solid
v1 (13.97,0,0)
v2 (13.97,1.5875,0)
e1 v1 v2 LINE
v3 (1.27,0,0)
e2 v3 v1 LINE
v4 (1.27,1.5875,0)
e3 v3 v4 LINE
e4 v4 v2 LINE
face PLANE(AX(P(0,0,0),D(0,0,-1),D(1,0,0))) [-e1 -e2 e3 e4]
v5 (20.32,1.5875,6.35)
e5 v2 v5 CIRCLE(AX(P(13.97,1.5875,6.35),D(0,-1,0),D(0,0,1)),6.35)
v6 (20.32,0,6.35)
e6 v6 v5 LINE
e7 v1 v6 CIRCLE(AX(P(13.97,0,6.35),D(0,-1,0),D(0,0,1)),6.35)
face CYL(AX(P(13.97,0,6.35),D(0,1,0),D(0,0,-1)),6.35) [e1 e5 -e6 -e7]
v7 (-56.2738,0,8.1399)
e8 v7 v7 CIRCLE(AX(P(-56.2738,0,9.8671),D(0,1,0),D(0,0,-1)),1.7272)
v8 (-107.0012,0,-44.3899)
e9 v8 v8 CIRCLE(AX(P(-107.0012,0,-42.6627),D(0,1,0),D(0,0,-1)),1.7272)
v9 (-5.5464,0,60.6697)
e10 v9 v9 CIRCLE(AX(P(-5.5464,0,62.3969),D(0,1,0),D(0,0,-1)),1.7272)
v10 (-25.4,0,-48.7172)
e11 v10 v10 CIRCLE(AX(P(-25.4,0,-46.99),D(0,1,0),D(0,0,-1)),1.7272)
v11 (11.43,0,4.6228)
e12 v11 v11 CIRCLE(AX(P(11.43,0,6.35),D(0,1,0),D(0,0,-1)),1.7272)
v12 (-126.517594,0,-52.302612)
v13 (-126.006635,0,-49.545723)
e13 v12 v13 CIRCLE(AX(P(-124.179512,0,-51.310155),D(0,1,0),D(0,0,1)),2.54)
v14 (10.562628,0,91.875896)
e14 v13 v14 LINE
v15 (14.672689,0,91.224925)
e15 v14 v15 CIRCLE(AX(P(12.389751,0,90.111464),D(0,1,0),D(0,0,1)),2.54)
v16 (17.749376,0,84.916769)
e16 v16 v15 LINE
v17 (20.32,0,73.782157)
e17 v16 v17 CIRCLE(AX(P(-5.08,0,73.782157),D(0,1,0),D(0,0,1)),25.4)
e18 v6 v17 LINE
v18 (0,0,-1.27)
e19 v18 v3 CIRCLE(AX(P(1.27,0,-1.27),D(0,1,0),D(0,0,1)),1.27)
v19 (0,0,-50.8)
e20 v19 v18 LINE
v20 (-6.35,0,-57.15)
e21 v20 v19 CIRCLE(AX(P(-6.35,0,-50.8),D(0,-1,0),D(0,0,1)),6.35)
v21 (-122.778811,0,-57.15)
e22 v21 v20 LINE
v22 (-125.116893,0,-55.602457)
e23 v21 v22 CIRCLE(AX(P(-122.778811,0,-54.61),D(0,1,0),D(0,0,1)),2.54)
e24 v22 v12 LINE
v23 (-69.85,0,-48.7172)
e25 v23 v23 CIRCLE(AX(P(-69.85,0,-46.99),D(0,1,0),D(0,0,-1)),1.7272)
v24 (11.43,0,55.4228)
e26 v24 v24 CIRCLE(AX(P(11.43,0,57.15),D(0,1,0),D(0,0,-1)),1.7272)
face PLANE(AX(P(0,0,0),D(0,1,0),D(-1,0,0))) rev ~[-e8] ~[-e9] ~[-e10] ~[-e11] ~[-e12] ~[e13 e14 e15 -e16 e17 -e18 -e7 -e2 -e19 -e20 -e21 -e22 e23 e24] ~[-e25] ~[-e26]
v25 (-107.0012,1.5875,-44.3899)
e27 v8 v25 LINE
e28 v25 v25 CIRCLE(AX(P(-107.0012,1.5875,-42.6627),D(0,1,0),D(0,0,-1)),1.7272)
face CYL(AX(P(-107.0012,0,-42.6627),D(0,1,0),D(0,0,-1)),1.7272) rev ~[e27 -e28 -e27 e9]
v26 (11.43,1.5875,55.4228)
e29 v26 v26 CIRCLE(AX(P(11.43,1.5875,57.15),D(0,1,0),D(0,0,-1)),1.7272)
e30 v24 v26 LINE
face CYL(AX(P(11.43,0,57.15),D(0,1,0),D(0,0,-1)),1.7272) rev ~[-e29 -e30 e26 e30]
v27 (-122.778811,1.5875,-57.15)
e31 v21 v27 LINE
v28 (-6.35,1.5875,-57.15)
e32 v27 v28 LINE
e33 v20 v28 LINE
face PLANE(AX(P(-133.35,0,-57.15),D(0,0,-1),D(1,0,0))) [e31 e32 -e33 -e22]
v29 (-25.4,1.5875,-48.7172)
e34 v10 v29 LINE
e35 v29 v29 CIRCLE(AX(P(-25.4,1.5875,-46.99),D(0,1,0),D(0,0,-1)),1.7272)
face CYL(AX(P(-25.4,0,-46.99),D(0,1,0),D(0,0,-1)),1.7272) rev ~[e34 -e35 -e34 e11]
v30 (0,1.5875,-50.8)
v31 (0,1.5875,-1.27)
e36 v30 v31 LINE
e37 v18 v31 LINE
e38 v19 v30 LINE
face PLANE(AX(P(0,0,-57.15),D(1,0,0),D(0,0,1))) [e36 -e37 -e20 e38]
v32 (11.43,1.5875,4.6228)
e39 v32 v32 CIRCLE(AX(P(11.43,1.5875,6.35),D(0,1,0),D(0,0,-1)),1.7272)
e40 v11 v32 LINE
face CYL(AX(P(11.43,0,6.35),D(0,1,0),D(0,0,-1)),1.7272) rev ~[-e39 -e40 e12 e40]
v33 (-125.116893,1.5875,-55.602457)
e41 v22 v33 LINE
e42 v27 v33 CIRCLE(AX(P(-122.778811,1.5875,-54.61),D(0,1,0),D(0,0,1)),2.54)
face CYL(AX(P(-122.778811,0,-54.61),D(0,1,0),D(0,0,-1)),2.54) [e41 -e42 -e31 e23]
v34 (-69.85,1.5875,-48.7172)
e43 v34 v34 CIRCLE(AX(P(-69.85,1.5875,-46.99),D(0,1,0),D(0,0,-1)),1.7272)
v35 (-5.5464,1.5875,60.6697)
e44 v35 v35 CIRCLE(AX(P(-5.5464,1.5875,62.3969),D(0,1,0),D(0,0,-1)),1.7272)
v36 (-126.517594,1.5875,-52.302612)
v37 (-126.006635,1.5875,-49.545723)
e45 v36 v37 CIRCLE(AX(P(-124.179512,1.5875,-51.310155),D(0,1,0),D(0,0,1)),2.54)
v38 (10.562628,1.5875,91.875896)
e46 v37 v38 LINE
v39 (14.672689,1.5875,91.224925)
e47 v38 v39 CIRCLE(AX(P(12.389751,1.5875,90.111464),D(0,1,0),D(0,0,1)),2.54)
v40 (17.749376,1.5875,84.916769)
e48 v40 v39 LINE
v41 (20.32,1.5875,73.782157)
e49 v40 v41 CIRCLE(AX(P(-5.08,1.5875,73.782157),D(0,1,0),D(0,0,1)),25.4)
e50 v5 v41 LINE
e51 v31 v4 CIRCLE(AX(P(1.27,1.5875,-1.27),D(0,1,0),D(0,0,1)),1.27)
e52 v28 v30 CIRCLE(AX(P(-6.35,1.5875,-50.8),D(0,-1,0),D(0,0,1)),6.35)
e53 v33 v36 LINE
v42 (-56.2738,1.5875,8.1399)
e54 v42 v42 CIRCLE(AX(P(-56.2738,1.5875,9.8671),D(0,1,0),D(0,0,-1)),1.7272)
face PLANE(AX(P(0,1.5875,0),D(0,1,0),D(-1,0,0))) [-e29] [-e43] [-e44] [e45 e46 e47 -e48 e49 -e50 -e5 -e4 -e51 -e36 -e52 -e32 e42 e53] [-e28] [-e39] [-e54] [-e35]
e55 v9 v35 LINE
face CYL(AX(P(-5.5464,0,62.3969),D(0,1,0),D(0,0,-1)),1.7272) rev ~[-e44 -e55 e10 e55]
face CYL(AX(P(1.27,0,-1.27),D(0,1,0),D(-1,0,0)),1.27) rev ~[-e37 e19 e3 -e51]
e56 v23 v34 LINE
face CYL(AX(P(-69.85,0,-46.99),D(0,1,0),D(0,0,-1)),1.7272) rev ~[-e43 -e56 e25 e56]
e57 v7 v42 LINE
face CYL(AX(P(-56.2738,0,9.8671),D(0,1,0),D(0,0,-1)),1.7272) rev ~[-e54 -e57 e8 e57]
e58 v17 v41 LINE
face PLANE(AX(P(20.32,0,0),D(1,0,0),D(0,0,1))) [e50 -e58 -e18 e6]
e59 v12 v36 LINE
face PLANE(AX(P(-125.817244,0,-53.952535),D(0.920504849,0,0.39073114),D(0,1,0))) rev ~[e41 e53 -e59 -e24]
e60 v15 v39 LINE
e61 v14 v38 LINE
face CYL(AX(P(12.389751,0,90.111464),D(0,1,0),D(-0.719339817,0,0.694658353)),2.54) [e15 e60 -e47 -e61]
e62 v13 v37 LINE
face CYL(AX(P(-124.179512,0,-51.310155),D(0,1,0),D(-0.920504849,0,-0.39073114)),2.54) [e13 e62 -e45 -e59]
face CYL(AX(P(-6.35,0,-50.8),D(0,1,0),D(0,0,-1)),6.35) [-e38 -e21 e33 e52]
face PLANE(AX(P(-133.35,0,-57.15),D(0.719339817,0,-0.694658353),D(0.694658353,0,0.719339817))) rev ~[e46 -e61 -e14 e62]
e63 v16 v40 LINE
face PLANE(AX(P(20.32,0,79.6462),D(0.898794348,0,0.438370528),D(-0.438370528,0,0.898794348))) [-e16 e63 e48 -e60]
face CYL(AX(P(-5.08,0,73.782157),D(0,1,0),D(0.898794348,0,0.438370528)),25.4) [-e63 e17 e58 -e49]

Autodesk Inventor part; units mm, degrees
ref_plane "YZ Plane" through (0, 0, 0) normal (1, 0, 0) x (0, 1, 0)
ref_plane "XZ Plane" through (0, 0, 0) normal (0, 1, 0) x (-1, 0, 0)
ref_plane "XY Plane" through (0, 0, 0) normal (0, 0, 1) x (1, 0, 0)
sketch "Sketch1" plane through (0, 0, 0) normal (0, 1, 0) x (-1, 0, 0)
  line L0 (0, 0) -> (-20.32, 0)
  line L1 (-20.32, 0) -> (-20.32, 79.6462)
  line L2 (-20.32, 79.6462) -> (-13.0825, 94.4853)
  line L3 (133.35, -57.15) -> (0, -57.15)
  line L4 (0, -57.15) -> (0, 0)
  line L5 (25.4, -46.99) -> (69.85, -46.99) construction
  line L6 (107.0012, -42.6627) -> (5.5464, 62.3969) construction
  line L7 (-11.43, 57.15) -> (-11.43, 6.35) construction
  line L8 (164.084, 0) -> (-51.054, 0) construction
  line L9 (133.35, -57.15) -> (-13.0825, 94.4853)
  line L10 (107.0012, -42.6627) -> (113.3962, -36.4872) construction
  point P0 (56.2738, 9.8671)
  dimension "d25" = 50.8
  dimension "d26" = 146.05
  dimension "d27" = 73.025
  dimension "d28" = 44.45
  dimension "d32" = 57.15
  dimension "d33" = 133.35
  dimension "d44" = 20.32
  dimension "d46" = 8.89
  dimension "d47" = 10.16
  dimension "d49" = 25.4
  dimension "d60" = 46
  dimension "d61" = 8.89
  dimension "d64" = 6.35
  dimension "d66" = 28.7247
  dimension "d71" = 70
  dimension "d72" = 16.51
extrude "Plate1" add sketch "Sketch1" along normal blind 1.5875
hole "Hole1" at (-5.5464, 0, 62.3969) at (11.43, 0, 57.15) at (-56.2738, 0, 9.8671) at (-107.0012, 0, -42.6627) at (-69.85, 0, -46.99) at (-25.4, 0, -46.99) at (11.43, 0, 6.35) direction (0, 1, 0) diameter 3.4544 end through all
chamfer "Corner Chamfer1" distance 8.89 angle 45 1 edges at (-133.35, 0.7937, -57.15)
fillet "Corner Round1" radius 6.35 2 edges at (20.32, 0.7937, 0) (0, 0.7937, -57.15)
fillet "Corner Round1" radius 2.54 3 edges at (13.0825, 0.7937, 94.4853) (-127.1745, 0.7937, -50.7551) (-124.46, 0.7937, -57.15)
fillet "Corner Round1" radius 1.27 1 edges at (0, 0.7937, 0)
fillet "Corner Round1" radius 25.4 1 edges at (20.32, 0.7937, 79.6462)
equation "\"d27\" = 0.5 * d26"
equation "\"BendReliefWidth\" = Thickness"
equation "\"BendReliefDepth\" = 0.5 * Thickness"
equation "\"MinimumRemnant\" = 2 * Thickness"
equation "\"GapSize\" = Thickness"
equation "\"Thickness\" = 1.5875"
properties part number "J009838" material "Polycarbonate, Clear"
